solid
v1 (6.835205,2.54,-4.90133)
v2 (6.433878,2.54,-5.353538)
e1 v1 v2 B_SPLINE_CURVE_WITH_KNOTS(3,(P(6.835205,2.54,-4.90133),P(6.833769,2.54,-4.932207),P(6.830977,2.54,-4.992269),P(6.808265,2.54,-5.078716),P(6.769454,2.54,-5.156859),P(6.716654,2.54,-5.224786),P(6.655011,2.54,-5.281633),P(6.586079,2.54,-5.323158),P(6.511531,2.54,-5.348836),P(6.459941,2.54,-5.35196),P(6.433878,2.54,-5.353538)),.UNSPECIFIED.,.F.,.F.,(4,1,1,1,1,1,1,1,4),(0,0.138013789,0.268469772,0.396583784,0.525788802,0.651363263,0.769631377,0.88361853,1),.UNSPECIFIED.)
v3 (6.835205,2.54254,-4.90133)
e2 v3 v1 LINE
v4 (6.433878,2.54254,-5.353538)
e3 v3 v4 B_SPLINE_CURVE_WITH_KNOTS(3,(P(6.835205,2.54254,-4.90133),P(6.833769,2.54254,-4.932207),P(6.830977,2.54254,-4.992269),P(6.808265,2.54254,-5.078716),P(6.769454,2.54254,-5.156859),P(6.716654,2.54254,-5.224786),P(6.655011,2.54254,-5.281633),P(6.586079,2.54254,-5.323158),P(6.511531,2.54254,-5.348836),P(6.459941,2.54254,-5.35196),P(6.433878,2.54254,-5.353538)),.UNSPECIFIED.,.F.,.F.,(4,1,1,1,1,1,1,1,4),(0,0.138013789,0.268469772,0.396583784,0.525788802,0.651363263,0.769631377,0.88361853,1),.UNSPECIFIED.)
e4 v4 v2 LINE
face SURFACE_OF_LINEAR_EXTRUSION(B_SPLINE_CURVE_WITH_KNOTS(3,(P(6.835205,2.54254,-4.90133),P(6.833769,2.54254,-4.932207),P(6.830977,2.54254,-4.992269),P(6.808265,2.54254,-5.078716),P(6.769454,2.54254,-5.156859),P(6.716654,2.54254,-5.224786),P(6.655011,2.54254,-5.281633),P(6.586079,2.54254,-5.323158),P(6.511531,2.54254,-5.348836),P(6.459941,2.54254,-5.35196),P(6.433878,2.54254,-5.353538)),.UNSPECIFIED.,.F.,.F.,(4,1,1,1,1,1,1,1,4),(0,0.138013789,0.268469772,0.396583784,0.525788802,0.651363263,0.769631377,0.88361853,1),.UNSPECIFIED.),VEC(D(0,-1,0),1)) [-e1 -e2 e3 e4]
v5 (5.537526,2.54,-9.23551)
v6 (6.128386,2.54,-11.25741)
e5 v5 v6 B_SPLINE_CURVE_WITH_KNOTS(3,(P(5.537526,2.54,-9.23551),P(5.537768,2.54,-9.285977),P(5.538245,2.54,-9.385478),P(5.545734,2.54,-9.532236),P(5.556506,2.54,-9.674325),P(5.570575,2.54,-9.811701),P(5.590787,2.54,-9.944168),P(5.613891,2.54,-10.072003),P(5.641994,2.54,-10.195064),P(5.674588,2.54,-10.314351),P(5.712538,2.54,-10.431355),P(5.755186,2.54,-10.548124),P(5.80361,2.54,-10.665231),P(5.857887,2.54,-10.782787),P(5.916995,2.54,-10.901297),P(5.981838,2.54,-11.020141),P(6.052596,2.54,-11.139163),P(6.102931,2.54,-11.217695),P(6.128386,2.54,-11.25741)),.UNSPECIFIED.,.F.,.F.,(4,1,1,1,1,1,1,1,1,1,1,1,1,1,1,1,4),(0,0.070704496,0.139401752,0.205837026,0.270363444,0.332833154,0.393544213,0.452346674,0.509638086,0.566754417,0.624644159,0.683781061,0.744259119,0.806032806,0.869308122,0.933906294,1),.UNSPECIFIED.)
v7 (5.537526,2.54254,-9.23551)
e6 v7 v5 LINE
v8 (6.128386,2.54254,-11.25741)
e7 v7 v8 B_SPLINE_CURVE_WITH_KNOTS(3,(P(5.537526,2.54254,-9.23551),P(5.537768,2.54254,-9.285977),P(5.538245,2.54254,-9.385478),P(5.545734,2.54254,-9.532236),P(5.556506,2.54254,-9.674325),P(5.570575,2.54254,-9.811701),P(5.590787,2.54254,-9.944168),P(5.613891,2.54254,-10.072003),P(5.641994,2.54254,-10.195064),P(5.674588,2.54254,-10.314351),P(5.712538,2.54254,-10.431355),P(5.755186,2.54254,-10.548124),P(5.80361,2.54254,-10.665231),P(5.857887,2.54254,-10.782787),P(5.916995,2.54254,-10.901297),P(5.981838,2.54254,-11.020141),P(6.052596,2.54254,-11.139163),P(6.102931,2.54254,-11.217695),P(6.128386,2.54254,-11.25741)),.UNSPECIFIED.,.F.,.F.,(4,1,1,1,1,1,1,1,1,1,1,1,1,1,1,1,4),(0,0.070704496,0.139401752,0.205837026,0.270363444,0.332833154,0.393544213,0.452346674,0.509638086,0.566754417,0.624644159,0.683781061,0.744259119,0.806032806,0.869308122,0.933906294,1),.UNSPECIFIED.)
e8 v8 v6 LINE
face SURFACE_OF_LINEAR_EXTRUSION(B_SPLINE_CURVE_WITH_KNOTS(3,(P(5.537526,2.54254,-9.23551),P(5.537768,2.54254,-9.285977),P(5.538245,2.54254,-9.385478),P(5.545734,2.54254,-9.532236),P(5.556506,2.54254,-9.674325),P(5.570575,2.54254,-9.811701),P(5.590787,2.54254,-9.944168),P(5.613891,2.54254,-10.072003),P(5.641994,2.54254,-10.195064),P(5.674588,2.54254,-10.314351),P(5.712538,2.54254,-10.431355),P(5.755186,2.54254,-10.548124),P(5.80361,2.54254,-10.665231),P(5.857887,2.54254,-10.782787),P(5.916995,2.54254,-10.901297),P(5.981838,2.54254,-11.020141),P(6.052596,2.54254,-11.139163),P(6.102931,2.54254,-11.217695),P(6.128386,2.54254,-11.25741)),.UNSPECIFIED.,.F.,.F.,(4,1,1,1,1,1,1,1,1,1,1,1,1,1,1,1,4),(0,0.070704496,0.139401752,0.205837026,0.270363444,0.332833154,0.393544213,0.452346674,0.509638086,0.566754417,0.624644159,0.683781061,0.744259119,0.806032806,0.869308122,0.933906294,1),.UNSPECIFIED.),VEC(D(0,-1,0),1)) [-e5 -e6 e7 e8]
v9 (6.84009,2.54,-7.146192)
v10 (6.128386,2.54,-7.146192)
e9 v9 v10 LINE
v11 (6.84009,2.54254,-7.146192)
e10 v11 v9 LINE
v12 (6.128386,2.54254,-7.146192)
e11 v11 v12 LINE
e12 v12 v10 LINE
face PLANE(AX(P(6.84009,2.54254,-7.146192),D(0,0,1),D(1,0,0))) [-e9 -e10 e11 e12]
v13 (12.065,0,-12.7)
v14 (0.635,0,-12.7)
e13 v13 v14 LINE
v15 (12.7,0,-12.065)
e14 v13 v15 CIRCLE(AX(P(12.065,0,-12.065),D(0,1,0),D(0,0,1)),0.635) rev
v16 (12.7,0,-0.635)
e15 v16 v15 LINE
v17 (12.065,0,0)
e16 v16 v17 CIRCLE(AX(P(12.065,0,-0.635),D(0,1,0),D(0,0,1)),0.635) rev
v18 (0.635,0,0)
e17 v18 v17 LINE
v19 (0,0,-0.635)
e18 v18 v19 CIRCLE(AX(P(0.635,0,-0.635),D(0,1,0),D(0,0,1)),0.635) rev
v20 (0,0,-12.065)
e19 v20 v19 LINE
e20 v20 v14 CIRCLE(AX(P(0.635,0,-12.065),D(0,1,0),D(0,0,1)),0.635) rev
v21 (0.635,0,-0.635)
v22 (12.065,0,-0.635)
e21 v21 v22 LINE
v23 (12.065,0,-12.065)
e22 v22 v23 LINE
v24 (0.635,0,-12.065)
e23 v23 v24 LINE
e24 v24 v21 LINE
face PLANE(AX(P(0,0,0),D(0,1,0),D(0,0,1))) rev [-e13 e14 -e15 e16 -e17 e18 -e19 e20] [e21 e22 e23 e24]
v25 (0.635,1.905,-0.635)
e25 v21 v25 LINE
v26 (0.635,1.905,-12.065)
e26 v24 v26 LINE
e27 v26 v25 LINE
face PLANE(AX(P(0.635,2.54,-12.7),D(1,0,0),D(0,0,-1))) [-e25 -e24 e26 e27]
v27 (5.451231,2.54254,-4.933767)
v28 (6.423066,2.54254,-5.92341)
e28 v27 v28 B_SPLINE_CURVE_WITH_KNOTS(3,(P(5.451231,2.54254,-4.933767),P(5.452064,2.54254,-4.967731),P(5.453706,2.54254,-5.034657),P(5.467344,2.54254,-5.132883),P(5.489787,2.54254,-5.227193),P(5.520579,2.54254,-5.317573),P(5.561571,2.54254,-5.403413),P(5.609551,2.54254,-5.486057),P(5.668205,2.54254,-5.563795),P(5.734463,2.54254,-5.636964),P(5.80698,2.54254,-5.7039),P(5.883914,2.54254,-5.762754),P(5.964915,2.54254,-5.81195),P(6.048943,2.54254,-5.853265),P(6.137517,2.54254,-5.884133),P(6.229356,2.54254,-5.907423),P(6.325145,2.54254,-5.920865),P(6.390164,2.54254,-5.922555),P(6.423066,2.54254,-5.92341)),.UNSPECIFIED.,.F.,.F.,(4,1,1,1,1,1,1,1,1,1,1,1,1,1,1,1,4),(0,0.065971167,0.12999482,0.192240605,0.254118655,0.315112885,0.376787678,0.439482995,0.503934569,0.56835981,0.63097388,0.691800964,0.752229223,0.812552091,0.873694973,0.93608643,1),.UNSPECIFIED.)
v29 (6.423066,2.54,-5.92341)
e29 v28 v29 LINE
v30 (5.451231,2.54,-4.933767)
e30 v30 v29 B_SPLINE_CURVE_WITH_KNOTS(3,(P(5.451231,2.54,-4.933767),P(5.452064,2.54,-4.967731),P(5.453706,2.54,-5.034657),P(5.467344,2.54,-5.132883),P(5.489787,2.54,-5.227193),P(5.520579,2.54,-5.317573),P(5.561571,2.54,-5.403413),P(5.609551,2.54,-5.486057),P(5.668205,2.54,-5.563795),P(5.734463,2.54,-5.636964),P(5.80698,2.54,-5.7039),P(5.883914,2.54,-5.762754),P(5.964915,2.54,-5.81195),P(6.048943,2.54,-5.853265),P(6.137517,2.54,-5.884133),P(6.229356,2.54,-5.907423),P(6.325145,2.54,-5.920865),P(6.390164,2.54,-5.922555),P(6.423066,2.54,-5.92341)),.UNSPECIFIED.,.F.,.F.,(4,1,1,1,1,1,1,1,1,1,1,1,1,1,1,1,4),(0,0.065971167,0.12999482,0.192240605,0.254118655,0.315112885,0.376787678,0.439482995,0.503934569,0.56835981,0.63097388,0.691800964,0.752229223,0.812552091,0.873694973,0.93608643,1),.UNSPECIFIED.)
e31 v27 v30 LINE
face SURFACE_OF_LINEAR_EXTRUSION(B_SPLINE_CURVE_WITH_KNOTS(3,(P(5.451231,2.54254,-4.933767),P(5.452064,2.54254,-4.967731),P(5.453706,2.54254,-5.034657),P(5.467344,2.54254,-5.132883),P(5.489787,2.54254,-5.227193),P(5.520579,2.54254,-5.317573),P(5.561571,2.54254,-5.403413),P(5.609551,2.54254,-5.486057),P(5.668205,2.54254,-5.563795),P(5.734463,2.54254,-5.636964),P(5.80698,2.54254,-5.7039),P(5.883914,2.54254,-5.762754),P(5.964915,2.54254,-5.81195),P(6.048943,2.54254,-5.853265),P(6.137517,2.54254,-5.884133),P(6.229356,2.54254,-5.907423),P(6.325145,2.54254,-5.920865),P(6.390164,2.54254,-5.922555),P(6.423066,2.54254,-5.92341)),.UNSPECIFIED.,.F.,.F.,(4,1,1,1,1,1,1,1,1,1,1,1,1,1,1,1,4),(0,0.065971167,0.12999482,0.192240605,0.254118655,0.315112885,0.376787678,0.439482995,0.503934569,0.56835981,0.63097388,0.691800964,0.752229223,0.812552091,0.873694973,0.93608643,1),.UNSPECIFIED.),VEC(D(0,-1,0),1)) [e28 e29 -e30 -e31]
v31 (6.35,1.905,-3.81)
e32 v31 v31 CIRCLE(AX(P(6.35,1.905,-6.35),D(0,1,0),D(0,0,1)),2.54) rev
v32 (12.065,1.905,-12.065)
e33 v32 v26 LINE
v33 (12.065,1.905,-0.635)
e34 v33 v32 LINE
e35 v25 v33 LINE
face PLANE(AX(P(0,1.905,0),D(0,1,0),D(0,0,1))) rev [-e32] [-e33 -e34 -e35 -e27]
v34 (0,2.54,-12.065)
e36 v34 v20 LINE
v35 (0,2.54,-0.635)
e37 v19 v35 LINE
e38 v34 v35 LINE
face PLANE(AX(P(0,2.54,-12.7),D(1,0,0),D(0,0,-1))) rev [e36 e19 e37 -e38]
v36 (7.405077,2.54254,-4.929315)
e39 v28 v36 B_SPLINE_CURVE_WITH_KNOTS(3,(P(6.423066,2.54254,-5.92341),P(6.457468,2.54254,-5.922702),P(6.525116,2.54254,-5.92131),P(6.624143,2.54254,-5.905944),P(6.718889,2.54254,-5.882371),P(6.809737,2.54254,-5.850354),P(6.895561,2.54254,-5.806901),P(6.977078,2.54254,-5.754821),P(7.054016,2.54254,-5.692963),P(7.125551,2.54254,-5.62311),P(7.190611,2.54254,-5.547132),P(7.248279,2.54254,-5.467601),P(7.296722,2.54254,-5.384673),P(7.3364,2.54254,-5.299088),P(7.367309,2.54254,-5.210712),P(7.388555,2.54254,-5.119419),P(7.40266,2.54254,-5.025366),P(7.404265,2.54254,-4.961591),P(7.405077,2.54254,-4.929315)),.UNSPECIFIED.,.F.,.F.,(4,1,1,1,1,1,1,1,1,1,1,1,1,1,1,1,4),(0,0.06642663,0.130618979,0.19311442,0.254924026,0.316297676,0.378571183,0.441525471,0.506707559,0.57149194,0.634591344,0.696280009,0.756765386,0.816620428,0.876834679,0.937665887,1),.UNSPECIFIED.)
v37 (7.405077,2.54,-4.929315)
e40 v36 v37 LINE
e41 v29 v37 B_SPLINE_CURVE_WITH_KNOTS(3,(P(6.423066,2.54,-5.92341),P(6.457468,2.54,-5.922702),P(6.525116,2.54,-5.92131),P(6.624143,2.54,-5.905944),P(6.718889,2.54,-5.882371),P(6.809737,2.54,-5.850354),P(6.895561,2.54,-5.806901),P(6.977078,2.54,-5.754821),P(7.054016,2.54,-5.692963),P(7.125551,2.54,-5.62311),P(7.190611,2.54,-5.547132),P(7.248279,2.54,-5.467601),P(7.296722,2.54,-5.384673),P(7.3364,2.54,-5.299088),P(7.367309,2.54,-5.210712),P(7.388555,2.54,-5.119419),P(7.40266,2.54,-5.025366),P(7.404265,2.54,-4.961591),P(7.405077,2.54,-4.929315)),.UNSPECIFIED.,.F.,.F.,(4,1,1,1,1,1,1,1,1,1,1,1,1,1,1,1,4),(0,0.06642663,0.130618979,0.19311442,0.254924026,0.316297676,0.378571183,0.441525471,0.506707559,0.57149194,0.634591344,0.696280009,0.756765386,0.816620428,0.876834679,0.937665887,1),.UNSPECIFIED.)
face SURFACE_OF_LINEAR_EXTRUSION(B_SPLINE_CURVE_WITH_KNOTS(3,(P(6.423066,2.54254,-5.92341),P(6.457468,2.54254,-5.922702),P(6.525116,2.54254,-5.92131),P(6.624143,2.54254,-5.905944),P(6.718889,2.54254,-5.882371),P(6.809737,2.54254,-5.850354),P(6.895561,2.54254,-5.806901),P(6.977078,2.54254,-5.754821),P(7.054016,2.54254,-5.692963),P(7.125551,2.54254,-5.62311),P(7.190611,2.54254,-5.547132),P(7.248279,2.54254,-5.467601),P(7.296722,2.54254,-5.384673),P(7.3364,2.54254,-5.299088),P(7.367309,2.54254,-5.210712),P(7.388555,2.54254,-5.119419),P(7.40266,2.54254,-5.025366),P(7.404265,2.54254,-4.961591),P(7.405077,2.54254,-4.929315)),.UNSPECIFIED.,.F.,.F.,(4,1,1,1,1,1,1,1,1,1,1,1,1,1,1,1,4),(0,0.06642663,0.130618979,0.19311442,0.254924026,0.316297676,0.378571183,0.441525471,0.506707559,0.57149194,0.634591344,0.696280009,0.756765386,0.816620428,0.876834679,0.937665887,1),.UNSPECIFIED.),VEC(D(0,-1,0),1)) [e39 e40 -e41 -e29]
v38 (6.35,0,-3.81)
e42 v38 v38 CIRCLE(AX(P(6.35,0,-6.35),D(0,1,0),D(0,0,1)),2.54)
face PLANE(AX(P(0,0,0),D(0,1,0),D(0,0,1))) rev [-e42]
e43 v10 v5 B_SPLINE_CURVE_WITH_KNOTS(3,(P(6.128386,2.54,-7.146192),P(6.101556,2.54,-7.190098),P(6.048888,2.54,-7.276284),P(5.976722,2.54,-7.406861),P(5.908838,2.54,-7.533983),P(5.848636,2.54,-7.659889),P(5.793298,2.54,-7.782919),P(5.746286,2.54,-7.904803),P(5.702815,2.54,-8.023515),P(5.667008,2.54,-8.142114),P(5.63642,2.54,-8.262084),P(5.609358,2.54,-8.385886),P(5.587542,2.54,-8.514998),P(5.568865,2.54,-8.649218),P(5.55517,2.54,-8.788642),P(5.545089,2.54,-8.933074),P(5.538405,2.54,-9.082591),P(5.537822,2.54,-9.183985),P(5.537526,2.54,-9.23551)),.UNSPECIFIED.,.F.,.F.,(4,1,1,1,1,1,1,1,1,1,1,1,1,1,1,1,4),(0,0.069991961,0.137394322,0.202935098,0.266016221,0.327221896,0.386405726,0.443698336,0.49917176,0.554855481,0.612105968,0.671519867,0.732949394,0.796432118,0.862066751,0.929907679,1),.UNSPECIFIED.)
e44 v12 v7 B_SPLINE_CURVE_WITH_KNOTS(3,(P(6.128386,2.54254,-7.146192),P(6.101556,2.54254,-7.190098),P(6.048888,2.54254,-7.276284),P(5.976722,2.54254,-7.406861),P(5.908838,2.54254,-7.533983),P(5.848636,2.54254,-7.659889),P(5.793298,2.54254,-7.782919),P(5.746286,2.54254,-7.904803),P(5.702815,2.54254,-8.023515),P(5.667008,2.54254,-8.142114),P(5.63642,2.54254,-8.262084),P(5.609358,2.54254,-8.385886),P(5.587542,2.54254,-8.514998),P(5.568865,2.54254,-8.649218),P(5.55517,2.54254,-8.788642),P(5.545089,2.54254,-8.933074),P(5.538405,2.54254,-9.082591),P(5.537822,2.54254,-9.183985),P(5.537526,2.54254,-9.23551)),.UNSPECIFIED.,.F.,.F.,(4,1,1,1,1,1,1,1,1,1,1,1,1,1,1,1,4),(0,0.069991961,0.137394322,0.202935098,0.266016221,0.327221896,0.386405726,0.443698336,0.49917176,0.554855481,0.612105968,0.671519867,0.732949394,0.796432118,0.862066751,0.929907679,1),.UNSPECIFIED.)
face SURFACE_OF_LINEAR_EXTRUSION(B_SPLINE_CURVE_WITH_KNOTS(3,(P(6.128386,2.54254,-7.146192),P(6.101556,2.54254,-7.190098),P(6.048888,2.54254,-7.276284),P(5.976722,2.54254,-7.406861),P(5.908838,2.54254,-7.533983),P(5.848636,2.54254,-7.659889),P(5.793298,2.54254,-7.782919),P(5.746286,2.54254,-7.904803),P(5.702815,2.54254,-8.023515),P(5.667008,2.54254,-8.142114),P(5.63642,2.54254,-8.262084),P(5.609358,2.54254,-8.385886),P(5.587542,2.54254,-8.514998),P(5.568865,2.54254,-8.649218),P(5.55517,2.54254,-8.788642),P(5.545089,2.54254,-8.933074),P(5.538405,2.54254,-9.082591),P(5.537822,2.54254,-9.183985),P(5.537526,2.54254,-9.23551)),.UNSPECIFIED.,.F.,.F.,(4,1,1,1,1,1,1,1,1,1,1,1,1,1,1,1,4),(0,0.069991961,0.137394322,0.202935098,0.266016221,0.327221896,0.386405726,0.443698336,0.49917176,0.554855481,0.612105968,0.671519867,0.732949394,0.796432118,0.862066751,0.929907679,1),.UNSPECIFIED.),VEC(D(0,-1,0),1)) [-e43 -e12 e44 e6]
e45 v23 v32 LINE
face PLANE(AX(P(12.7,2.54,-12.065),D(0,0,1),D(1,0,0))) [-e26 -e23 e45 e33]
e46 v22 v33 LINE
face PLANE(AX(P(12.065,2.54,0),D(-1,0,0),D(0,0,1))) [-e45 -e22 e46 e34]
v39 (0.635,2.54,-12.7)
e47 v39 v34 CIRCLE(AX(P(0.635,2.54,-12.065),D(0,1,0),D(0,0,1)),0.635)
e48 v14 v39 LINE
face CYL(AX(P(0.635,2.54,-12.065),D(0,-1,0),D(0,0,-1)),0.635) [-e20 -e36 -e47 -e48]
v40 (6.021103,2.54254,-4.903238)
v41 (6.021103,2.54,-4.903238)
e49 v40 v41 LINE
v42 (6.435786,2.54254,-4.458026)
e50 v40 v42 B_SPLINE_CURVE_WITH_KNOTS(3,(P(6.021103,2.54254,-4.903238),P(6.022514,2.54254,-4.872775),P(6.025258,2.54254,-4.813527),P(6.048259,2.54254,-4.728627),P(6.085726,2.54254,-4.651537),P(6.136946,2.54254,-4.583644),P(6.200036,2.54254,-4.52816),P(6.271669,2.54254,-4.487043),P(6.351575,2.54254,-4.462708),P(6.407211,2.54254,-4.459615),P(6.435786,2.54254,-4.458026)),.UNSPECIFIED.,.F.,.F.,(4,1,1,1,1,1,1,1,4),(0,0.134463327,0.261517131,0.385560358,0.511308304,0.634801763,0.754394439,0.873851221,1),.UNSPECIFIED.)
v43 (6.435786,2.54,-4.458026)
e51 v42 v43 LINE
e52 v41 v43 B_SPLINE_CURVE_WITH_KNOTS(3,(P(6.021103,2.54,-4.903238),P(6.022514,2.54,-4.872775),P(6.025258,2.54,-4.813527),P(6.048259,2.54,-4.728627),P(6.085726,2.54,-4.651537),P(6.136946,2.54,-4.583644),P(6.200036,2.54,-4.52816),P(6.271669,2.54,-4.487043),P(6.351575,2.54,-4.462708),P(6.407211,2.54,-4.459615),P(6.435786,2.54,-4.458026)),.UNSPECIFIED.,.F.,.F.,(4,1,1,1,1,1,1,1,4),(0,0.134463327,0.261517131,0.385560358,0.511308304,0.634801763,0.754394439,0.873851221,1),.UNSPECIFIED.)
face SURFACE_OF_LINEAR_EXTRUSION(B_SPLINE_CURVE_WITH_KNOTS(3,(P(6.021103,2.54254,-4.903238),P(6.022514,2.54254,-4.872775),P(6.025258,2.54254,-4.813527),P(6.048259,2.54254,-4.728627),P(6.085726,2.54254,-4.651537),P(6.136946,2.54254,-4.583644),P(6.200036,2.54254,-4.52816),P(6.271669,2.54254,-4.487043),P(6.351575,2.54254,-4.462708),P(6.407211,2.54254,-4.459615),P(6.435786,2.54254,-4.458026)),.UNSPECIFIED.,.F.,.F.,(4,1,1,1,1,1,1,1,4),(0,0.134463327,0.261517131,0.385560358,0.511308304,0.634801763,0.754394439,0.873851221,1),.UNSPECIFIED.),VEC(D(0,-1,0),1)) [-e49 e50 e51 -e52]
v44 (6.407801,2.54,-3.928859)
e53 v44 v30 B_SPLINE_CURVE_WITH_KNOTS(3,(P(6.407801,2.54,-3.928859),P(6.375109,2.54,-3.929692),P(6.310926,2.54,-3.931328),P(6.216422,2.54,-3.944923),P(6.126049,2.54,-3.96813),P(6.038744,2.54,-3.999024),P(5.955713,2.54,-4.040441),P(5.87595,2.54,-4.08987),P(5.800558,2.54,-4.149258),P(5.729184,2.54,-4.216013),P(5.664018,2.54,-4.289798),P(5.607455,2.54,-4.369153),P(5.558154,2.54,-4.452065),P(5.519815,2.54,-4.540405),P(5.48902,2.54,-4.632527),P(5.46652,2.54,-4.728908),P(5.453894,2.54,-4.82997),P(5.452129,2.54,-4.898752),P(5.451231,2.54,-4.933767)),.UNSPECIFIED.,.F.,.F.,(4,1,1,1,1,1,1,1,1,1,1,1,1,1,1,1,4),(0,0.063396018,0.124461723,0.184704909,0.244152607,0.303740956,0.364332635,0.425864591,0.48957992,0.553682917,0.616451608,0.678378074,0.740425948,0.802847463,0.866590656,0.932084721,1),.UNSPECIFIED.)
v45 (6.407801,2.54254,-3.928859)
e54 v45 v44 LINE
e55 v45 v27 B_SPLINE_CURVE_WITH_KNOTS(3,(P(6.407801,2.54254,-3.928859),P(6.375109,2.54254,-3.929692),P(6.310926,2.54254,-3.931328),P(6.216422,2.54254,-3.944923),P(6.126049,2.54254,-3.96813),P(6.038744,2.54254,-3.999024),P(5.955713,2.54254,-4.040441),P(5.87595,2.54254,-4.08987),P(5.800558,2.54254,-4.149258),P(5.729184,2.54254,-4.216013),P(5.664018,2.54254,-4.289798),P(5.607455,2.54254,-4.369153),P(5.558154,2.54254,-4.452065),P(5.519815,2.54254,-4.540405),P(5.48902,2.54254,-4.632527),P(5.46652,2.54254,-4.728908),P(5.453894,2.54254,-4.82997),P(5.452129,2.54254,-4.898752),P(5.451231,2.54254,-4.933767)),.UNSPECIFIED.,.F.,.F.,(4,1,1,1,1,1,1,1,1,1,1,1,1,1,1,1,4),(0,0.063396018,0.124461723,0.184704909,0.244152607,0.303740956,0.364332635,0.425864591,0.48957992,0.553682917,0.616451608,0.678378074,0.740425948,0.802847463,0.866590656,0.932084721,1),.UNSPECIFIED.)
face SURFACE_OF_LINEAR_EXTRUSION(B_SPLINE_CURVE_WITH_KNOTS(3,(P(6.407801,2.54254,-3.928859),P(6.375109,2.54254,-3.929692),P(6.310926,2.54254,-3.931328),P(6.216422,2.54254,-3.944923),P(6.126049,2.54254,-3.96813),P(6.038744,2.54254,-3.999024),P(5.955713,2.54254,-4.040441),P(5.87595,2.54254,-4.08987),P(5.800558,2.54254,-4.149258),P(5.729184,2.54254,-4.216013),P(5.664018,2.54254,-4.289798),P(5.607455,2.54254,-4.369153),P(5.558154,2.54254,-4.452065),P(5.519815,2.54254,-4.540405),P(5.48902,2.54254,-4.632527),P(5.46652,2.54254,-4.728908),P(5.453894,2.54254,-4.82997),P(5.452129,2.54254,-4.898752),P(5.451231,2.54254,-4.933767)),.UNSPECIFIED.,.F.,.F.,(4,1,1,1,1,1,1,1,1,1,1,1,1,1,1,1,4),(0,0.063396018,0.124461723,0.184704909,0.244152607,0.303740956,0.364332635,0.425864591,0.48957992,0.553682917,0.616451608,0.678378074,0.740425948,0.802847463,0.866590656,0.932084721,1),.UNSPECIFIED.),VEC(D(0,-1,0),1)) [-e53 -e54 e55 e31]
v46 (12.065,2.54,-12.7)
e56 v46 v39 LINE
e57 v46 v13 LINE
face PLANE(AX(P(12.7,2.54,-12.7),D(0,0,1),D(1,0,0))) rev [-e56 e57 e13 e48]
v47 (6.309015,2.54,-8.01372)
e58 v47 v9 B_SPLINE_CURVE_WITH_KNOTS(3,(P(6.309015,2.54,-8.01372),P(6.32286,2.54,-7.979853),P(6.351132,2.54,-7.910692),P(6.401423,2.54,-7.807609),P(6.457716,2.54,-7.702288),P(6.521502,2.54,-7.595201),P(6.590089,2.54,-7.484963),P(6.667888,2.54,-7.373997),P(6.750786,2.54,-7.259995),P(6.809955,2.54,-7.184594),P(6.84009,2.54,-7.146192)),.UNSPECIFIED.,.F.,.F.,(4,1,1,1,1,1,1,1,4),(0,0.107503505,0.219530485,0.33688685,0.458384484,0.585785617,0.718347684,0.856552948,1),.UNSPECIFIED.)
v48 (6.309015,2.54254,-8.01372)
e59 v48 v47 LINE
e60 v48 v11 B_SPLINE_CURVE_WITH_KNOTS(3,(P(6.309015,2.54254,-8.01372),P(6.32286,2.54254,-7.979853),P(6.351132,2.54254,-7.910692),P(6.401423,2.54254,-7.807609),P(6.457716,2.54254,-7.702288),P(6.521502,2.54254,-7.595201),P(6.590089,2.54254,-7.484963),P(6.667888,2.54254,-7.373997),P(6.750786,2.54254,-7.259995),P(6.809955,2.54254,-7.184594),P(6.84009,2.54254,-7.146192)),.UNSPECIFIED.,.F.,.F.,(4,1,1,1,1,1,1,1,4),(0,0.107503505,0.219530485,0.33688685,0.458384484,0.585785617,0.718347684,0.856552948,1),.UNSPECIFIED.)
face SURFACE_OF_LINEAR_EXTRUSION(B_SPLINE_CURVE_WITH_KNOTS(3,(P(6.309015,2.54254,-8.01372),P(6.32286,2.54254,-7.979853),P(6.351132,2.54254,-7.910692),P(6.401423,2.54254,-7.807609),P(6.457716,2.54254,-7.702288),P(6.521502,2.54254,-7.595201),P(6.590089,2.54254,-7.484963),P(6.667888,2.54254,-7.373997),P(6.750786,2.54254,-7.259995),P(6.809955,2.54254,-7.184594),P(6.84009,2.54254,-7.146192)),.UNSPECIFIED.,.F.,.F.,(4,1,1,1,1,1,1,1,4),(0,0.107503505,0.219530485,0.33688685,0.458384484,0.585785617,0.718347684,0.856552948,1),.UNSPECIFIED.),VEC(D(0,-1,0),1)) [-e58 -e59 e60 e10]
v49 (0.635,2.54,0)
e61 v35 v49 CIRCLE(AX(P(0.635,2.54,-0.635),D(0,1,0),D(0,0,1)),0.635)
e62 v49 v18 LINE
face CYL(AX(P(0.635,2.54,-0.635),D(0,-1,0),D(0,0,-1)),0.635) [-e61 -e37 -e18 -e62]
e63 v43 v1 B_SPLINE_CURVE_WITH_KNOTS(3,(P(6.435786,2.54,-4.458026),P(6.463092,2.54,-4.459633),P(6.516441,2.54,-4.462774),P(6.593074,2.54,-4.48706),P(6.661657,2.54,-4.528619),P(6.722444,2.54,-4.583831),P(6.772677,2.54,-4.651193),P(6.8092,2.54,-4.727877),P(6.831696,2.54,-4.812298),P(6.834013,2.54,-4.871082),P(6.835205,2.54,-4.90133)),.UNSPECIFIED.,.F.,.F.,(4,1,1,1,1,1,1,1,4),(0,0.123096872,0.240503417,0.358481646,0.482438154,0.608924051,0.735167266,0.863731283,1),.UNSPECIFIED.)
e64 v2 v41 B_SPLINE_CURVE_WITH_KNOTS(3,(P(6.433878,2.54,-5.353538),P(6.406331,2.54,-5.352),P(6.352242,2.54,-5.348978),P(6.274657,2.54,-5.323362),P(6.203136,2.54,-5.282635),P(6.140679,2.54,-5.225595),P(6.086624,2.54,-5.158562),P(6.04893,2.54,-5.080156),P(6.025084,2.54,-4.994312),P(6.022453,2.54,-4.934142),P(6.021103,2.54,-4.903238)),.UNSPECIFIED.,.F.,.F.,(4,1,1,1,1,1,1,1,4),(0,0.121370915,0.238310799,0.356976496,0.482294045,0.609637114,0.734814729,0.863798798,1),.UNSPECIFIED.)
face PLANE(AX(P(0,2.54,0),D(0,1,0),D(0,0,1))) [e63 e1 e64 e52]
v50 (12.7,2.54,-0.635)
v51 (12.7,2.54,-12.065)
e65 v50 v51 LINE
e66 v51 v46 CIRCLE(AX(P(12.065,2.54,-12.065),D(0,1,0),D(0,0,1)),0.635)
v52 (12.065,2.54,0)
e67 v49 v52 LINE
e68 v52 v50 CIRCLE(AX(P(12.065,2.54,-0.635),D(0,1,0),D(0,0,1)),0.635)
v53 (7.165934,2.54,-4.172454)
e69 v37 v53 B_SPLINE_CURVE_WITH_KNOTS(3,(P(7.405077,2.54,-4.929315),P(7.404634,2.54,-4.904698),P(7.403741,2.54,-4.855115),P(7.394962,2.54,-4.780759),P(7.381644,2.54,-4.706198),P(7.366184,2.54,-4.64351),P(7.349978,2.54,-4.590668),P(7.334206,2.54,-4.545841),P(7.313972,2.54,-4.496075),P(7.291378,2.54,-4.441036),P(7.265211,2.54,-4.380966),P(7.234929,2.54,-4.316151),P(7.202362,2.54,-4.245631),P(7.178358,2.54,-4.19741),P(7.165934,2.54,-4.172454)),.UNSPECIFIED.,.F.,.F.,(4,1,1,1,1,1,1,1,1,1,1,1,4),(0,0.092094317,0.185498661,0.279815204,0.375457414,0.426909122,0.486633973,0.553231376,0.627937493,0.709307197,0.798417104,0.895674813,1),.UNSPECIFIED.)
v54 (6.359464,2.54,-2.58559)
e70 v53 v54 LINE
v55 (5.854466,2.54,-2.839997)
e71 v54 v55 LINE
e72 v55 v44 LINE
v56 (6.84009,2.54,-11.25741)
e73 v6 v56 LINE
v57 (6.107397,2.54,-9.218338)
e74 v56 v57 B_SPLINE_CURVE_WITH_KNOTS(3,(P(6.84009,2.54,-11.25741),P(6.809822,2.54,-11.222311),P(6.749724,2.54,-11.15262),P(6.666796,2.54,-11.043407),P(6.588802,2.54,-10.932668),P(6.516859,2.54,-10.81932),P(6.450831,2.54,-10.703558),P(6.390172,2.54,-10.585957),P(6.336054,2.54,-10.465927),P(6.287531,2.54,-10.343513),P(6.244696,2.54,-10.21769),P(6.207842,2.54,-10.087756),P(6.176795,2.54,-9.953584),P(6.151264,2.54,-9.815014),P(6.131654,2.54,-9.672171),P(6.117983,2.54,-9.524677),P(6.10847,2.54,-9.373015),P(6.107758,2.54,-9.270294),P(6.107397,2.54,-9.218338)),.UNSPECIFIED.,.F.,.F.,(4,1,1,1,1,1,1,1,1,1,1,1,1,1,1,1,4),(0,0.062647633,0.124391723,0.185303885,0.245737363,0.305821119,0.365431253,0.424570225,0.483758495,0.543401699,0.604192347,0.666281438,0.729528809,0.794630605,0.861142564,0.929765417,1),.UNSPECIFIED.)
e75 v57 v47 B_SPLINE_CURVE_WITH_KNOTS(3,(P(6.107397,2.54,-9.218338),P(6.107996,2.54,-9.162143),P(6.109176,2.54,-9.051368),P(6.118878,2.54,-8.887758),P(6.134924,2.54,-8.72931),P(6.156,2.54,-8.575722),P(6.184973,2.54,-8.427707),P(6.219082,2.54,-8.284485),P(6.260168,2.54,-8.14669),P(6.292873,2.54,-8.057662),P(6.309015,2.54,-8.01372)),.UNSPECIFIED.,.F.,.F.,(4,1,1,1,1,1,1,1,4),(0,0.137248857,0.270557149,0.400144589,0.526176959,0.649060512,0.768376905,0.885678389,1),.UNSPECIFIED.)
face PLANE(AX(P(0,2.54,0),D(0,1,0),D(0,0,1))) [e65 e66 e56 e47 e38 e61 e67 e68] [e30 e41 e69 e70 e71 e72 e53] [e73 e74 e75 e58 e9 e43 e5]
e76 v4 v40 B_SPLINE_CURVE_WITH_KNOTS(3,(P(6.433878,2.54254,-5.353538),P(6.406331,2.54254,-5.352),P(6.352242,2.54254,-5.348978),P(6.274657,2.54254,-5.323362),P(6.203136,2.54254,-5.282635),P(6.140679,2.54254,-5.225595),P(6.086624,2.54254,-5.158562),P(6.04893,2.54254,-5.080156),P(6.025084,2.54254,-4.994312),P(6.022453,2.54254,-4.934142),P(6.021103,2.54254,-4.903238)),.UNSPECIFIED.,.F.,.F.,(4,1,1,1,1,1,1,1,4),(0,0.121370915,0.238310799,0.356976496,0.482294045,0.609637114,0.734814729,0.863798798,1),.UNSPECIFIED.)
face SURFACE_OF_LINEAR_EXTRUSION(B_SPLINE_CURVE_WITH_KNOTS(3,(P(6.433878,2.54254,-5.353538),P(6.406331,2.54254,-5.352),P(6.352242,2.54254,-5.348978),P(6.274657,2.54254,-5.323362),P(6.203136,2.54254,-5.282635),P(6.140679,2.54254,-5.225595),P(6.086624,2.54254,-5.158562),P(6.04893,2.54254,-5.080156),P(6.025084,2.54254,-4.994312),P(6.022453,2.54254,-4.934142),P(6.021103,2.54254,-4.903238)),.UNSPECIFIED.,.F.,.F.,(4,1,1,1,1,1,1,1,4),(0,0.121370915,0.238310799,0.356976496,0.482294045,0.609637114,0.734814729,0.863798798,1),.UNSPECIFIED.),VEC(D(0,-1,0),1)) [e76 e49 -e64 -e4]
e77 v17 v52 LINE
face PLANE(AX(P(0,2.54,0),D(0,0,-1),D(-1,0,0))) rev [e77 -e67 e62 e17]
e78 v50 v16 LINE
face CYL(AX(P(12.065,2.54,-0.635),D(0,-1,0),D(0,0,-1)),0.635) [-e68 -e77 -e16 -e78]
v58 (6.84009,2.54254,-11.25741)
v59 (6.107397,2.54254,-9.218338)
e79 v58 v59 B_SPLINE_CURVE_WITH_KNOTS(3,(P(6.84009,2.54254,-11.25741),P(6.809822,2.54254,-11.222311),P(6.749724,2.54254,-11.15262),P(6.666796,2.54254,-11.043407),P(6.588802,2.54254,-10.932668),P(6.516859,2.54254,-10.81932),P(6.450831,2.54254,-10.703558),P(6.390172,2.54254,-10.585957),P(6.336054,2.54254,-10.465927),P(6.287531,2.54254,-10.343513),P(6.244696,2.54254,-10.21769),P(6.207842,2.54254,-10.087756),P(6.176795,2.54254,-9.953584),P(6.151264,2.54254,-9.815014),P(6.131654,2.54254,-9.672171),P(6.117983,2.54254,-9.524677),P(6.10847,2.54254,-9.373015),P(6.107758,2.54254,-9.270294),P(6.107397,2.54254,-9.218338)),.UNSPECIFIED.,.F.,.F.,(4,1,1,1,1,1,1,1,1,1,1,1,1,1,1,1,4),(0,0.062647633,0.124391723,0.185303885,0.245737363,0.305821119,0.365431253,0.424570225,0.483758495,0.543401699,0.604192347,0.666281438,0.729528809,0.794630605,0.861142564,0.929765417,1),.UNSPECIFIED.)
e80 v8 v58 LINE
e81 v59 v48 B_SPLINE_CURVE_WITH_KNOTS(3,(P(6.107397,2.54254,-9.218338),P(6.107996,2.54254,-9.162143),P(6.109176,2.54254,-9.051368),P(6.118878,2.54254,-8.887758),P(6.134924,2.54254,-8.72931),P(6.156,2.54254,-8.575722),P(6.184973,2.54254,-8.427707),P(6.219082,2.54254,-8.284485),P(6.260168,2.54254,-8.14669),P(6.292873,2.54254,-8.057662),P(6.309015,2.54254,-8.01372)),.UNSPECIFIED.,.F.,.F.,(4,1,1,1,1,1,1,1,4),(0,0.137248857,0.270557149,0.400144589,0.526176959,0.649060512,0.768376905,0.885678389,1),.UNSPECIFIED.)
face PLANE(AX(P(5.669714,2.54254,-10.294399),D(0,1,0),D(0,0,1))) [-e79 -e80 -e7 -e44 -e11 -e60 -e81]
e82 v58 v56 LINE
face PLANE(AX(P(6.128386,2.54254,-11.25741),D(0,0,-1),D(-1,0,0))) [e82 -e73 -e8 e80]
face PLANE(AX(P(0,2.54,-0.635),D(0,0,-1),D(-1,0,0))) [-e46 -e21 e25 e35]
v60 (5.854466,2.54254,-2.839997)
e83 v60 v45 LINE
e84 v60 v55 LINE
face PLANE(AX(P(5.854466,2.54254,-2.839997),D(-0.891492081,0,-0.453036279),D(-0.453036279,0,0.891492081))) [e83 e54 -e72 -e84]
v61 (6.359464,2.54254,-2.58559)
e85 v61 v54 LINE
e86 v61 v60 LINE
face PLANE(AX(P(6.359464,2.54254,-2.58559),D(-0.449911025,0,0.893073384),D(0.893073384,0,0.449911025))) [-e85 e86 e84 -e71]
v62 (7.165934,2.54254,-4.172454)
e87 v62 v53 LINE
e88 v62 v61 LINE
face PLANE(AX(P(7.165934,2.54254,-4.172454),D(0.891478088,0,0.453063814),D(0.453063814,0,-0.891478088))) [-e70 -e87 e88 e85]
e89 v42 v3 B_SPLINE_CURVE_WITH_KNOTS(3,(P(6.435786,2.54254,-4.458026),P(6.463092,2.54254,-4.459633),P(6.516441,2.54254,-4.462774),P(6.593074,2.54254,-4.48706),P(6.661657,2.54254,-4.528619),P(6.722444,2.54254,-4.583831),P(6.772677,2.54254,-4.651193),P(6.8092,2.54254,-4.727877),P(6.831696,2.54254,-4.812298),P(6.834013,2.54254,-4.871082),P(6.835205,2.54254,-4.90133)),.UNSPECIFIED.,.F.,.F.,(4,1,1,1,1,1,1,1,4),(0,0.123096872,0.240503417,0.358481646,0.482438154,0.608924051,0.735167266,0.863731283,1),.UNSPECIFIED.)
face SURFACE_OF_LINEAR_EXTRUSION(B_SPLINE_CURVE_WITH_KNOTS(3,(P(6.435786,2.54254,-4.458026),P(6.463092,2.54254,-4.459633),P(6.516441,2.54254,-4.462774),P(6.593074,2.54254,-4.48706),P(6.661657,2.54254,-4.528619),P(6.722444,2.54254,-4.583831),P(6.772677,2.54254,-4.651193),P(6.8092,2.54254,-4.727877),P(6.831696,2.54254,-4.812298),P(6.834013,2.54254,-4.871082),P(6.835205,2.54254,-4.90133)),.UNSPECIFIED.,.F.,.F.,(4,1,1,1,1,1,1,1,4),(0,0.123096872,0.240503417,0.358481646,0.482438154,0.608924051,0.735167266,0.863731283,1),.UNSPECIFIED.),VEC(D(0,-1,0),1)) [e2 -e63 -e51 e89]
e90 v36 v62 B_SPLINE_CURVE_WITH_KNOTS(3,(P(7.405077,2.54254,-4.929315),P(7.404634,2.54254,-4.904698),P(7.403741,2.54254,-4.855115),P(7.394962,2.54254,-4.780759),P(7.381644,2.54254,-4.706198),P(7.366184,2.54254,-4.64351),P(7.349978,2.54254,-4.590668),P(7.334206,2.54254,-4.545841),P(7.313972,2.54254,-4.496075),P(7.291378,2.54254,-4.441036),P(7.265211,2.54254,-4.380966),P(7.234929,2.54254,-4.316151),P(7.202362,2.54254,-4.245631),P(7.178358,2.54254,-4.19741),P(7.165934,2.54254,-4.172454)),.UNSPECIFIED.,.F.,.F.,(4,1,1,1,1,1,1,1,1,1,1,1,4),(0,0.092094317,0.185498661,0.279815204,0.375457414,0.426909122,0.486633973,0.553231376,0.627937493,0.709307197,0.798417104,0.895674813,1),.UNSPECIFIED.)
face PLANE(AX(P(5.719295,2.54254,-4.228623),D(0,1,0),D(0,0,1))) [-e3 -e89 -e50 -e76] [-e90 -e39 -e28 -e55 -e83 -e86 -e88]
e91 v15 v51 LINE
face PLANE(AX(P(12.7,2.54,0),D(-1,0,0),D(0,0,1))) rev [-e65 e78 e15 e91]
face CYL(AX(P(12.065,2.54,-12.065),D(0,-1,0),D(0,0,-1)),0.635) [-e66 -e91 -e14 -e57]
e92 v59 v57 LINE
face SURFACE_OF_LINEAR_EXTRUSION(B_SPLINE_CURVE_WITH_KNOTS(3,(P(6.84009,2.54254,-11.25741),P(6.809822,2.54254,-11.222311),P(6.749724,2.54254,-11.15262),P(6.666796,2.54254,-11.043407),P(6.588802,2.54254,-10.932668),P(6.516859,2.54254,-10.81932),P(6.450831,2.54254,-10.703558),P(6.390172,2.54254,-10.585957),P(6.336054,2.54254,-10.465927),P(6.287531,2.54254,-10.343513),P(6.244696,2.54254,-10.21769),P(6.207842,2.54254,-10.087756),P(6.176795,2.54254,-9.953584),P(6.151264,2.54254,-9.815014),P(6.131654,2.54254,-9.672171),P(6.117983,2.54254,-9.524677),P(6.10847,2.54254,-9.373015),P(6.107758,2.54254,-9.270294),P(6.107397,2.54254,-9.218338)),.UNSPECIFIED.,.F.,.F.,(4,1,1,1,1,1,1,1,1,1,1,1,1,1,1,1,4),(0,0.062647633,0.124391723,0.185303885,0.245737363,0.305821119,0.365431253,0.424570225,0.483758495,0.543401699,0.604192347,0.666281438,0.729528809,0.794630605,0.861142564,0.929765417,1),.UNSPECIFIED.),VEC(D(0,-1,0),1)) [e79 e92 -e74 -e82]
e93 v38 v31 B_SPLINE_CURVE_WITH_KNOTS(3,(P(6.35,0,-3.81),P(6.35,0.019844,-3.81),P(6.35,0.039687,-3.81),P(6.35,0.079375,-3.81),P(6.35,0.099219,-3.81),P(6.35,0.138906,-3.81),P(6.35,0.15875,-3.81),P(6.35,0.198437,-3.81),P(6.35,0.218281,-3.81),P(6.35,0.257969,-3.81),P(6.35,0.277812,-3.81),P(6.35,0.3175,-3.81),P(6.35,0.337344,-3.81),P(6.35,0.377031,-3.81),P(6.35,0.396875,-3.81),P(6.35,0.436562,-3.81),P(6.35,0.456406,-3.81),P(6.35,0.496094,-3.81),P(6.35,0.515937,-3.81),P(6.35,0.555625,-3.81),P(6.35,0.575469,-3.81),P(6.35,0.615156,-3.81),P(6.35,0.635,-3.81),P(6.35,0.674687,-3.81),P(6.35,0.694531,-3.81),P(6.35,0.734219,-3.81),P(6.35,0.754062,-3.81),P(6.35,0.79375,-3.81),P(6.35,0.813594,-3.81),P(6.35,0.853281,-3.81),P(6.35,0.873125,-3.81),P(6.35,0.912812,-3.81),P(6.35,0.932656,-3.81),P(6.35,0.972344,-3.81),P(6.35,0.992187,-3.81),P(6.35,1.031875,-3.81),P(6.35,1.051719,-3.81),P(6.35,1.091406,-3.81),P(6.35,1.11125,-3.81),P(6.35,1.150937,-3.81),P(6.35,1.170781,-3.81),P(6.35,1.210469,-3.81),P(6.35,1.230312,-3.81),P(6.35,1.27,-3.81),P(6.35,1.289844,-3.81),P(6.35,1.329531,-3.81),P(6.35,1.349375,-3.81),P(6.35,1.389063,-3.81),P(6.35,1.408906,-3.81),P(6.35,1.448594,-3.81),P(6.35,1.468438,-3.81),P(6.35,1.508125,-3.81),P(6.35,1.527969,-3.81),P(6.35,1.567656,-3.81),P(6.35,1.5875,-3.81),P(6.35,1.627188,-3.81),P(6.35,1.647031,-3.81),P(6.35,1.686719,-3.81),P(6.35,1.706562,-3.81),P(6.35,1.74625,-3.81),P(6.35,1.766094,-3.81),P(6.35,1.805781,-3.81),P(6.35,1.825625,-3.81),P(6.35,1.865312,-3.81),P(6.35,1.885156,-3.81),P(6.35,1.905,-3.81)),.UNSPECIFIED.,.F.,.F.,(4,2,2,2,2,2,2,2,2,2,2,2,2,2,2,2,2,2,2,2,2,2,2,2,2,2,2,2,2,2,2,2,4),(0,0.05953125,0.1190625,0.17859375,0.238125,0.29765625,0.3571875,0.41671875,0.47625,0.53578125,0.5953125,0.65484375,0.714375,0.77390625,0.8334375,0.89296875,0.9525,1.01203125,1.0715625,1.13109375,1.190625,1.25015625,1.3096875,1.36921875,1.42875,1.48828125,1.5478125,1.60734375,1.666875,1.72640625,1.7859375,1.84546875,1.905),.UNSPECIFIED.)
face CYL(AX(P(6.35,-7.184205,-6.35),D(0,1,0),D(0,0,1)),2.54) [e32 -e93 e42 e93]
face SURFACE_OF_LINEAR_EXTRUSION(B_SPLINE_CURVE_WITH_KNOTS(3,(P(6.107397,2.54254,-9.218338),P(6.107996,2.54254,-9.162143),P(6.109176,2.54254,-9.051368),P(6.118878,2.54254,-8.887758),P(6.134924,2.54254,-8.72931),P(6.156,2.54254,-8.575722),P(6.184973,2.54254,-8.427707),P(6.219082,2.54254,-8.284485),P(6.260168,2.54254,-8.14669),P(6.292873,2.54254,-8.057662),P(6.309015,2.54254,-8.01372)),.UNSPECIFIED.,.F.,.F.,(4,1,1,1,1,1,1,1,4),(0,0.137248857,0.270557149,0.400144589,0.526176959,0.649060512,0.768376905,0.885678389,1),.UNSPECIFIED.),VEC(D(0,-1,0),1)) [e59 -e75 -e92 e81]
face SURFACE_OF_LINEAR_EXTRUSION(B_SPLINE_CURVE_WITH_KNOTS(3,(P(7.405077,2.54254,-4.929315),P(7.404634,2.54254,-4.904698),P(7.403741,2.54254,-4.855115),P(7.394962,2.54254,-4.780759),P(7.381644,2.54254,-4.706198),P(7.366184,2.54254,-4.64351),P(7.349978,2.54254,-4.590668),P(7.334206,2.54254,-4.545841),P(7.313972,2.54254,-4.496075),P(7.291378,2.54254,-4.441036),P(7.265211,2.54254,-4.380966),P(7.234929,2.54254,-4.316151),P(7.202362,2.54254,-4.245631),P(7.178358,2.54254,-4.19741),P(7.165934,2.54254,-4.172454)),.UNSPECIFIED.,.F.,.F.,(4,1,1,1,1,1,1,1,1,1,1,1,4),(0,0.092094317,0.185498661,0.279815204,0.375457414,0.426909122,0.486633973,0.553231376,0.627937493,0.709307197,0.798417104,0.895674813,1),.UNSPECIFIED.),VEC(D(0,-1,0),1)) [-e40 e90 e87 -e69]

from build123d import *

# Parameters (mm, degrees)
SKETCH1_W           = 12.7
SKETCH1_H           = 12.7
BOSS_EXTRUDE1_DEPTH = 2.54
FILLET1_R           = 0.635
SHELL1_START        = 0.635
SHELL1_OUTLINE_W    = 1.905
SHELL1_OUTLINE_H    = 11.43
SHELL1_DEPTH        = 11.43
SKETCH2_R           = 2.54
BOSS_EXTRUDE2_DEPTH = 1.905
BOSS_EXTRUDE4_DEPTH = 0.00254


# Read off the part's stored shape, not the designer's step: Shell1
with BuildPart() as part:
    # Sketch1 → Boss-Extrude1 (new body)
    with BuildSketch(Plane(origin=(0, 0, 0), x_dir=(1, 0, 0), z_dir=(0, 1, 0))):
        with Locations((6.35, 6.35)):
            Rectangle(SKETCH1_W, SKETCH1_H)
    extrude(amount=BOSS_EXTRUDE1_DEPTH)

    # Fillet1
    fillet1_edges = [part.edges().sort_by_distance(p)[0] for p in [
        (0, 1.27, -12.7),
        (12.7, 1.27, -12.7),
        (12.7, 1.27, 0),
        (0, 1.27, 0),
    ]]
    fillet(fillet1_edges, radius=FILLET1_R)

    # Shell1 outline → Shell1 (cut)
    with BuildSketch(Plane.YZ.offset(SHELL1_START)):
        with Locations((0.9525, -6.35)):
            Rectangle(SHELL1_OUTLINE_W, SHELL1_OUTLINE_H)
    extrude(amount=SHELL1_DEPTH, mode=Mode.SUBTRACT)

    # Sketch2 → Boss-Extrude2 (add)
    with BuildSketch(Plane(origin=(0, 1.905, 0), x_dir=(-1, 0, 0), z_dir=(0, -1, 0))):
        with Locations(Location((-6.35, 6.35, 0), (0, 0, 270))):
            Circle(SKETCH2_R)
    extrude(amount=BOSS_EXTRUDE2_DEPTH)

    # Sketch4 → Boss-Extrude4 (add)
    # profile 1 of 2: a face of its own
    with BuildSketch(Plane(origin=(0, 2.54, 0), x_dir=(1, 0, 0), z_dir=(0, 1, 0))):
        with BuildLine():
            Line((6.359463942, 2.585589744), (5.854465946, 2.839996795))
            Line((5.854465946, 2.839996795), (6.407801282, 3.928858974))
            add(Edge.make_bspline(
                [(6.407801282, 3.928858974), (6.37510896, 3.929692258), (6.310926022, 3.931328196), (6.216421654, 3.944922824), (6.126049401, 3.968129722), (6.038744074, 3.999023949), (5.955713077, 4.040440861), (5.875949592, 4.089869773), (5.800557817, 4.1492579), (5.72918427, 4.21601261), (5.664017941, 4.289798172), (5.607454945, 4.369153296), (5.558153789, 4.452064974), (5.519814505, 4.540404997), (5.489020198, 4.632526927), (5.466520324, 4.728907598), (5.45389399, 4.829969864), (5.452129186, 4.898751737), (5.451230769, 4.933766827)],
                knots=[0, 0, 0, 0, 1.014336294, 1.991387562, 2.955278539, 3.906441712, 4.859855302, 5.829322156, 6.813833455, 7.833278715, 8.858926674, 9.863225732, 10.85404919, 11.846815163, 12.845559416, 13.865450493, 14.913355531, 16, 16, 16, 16], degree=3))
            add(Edge.make_bspline(
                [(5.451230769, 4.933766827), (5.4520641, 4.967731119), (5.45370616, 5.034657053), (5.467343628, 5.132882545), (5.48978737, 5.227193368), (5.520579382, 5.317573499), (5.561571384, 5.40341349), (5.60955148, 5.486057396), (5.66820497, 5.563795404), (5.734463459, 5.636964041), (5.80697986, 5.703900425), (5.883913674, 5.762753864), (5.964915094, 5.811949684), (6.048943173, 5.853265097), (6.137516777, 5.884133404), (6.229355921, 5.907423313), (6.325144744, 5.920864918), (6.3901642, 5.922555021), (6.423065705, 5.923410256)],
                knots=[0, 0, 0, 0, 1.055538678, 2.079917126, 3.075849687, 4.065898488, 5.041806164, 6.028602842, 7.031727914, 8.062953097, 9.093756959, 10.095582084, 11.068815425, 12.035667573, 13.000833448, 13.979119574, 14.977382875, 16, 16, 16, 16], degree=3))
            add(Edge.make_bspline(
                [(6.423065705, 5.923410256), (6.457468209, 5.922702118), (6.525116079, 5.92130966), (6.624143475, 5.905944432), (6.71888888, 5.882371363), (6.809737259, 5.850354325), (6.895560767, 5.806900578), (6.977077532, 5.754820959), (7.054016404, 5.692963174), (7.125551114, 5.623110154), (7.190611134, 5.547131925), (7.248278747, 5.467601049), (7.296721989, 5.384673031), (7.336399968, 5.299087975), (7.367308914, 5.210711801), (7.388554875, 5.119419152), (7.402659837, 5.025366142), (7.4042647, 4.961591251), (7.405076923, 4.929314704)],
                knots=[0, 0, 0, 0, 1.062826075, 2.08990367, 3.089830715, 4.078784409, 5.060762809, 6.057138927, 7.064407536, 8.107320944, 9.143871033, 10.153461498, 11.140480137, 12.108246174, 13.065926856, 14.029354859, 15.002654194, 16, 16, 16, 16], degree=3))
            add(Edge.make_bspline(
                [(7.405076923, 4.929314704), (7.404633685, 4.904698148), (7.403740905, 4.855114869), (7.39496241, 4.780759368), (7.381643664, 4.706197784), (7.36618444, 4.643509984), (7.349977595, 4.590667976), (7.334206488, 4.545841333), (7.313971695, 4.496075342), (7.291377525, 4.441036433), (7.265210817, 4.38096596), (7.234929053, 4.316151081), (7.202362379, 4.245630527), (7.178357526, 4.197409534), (7.165934295, 4.172453726)],
                knots=[0, 0, 0, 0, 1.105131805, 2.225983929, 3.357782449, 4.505488967, 5.122909461, 5.839607681, 6.638776516, 7.535249922, 8.51168636, 9.581005249, 10.748097757, 12, 12, 12, 12], degree=3))
            Line((7.165934295, 4.172453726), (6.359463942, 2.585589744))
        make_face()
        with BuildLine():
            add(Edge.make_bspline(
                [(6.435786058, 4.458025641), (6.46309194, 4.459633217), (6.516441451, 4.462774058), (6.593074476, 4.487059704), (6.661657137, 4.528619041), (6.722444439, 4.583831174), (6.772677205, 4.651192501), (6.809199713, 4.727877384), (6.831696453, 4.812297764), (6.834013104, 4.871082471), (6.835205128, 4.901329928)],
                knots=[0, 0, 0, 0, 0.984774978, 1.924027336, 2.867853169, 3.859505234, 4.871392407, 5.881338128, 6.909850265, 8, 8, 8, 8], degree=3))
            add(Edge.make_bspline(
                [(6.835205128, 4.901329928), (6.833769465, 4.932206601), (6.830976757, 4.992269104), (6.808264507, 5.078715896), (6.76945384, 5.156858669), (6.716654147, 5.224786259), (6.655011194, 5.281632973), (6.586078813, 5.323157968), (6.511530825, 5.348835693), (6.45994101, 5.351960048), (6.433878005, 5.353538462)],
                knots=[0, 0, 0, 0, 1.104110315, 2.147758178, 3.172670271, 4.206310416, 5.210906102, 6.157051016, 7.068948237, 8, 8, 8, 8], degree=3))
            add(Edge.make_bspline(
                [(6.433878005, 5.353538462), (6.406330871, 5.351999712), (6.3522423, 5.348978389), (6.274657461, 5.323362327), (6.203136419, 5.282634751), (6.140678718, 5.225595158), (6.086623972, 5.158562153), (6.048930123, 5.080155613), (6.025083687, 4.99431208), (6.022453466, 4.934141867), (6.021102564, 4.903237981)],
                knots=[0, 0, 0, 0, 0.970967322, 1.90648639, 2.855811969, 3.858352357, 4.877096915, 5.878517833, 6.91039038, 8, 8, 8, 8], degree=3))
            add(Edge.make_bspline(
                [(6.021102564, 4.903237981), (6.022513665, 4.872774607), (6.025258108, 4.813526525), (6.048259331, 4.728627364), (6.085726018, 4.651536658), (6.136945653, 4.583644091), (6.20003563, 4.528159923), (6.271669441, 4.487043277), (6.3515753, 4.462708207), (6.407210509, 4.459614594), (6.435786058, 4.458025641)],
                knots=[0, 0, 0, 0, 1.075706617, 2.092137047, 3.084482865, 4.090466434, 5.0784141, 6.035155512, 6.990809768, 8, 8, 8, 8], degree=3))
        make_face(mode=Mode.SUBTRACT)
    # profile 2 of 2: a face of its own
    with BuildSketch(Plane(origin=(0, 2.54, 0), x_dir=(1, 0, 0), z_dir=(0, 1, 0))):
        with BuildLine():
            Line((6.128386018, 11.257410256), (6.840089744, 11.257410256))
            add(Edge.make_bspline(
                [(6.840089744, 11.257410256), (6.809822419, 11.222311467), (6.749724305, 11.152620105), (6.666795677, 11.043407385), (6.58880222, 10.932667564), (6.516859259, 10.819319518), (6.450831014, 10.703557736), (6.390172367, 10.585956901), (6.336053768, 10.465927477), (6.287531103, 10.343512884), (6.244695572, 10.21769031), (6.207842411, 10.087755624), (6.176795055, 9.953583531), (6.151264275, 9.815013647), (6.131654114, 9.672170871), (6.117982965, 9.524677216), (6.108469866, 9.373014933), (6.107757668, 9.270294234), (6.107397436, 9.21833774)],
                knots=[0, 0, 0, 0, 1.00236213, 1.990267575, 2.964862165, 3.931797803, 4.893137898, 5.846900052, 6.793123604, 7.740135921, 8.694427184, 9.667077551, 10.660503013, 11.672460941, 12.714089686, 13.778281025, 14.87624668, 16, 16, 16, 16], degree=3))
            add(Edge.make_bspline(
                [(6.107397436, 9.21833774), (6.107995993, 9.162143219), (6.109175923, 9.051367583), (6.118877551, 8.887757803), (6.134923993, 8.729310145), (6.155999738, 8.575722074), (6.184973215, 8.427707126), (6.219082012, 8.284484773), (6.260167582, 8.146690387), (6.292872796, 8.057661908), (6.309015024, 8.013720353)],
                knots=[0, 0, 0, 0, 1.097990858, 2.164457195, 3.201156713, 4.209415668, 5.192484095, 6.147015238, 7.085427113, 8, 8, 8, 8], degree=3))
            add(Edge.make_bspline(
                [(6.309015024, 8.013720353), (6.322859685, 7.979852544), (6.351131554, 7.910691856), (6.401423106, 7.807609383), (6.457716212, 7.702288141), (6.521502326, 7.595201452), (6.590089423, 7.484963434), (6.66788775, 7.373996815), (6.750785957, 7.259995238), (6.809954754, 7.184594376), (6.840089744, 7.146192308)],
                knots=[0, 0, 0, 0, 0.860028042, 1.756243877, 2.695094802, 3.667075869, 4.686284936, 5.746781471, 6.852423585, 8, 8, 8, 8], degree=3))
            Line((6.840089744, 7.146192308), (6.128386018, 7.146192308))
            add(Edge.make_bspline(
                [(6.128386018, 7.146192308), (6.101555843, 7.190097535), (6.048888171, 7.276283561), (5.97672167, 7.406860871), (5.908837677, 7.533983087), (5.84863606, 7.65988857), (5.79329841, 7.782919252), (5.746285673, 7.904803232), (5.702814586, 8.023514572), (5.667008208, 8.142113651), (5.636420071, 8.262084169), (5.609358218, 8.385886124), (5.587541556, 8.514997933), (5.568864716, 8.649218102), (5.555169811, 8.788642241), (5.545088524, 8.933073848), (5.538405493, 9.082591024), (5.537822099, 9.183985488), (5.537525641, 9.235510216)],
                knots=[0, 0, 0, 0, 1.119871376, 2.19830916, 3.246961562, 4.256259542, 5.235550337, 6.182491613, 7.09917337, 7.986748165, 8.877687696, 9.793695483, 10.744317876, 11.727190303, 12.742913882, 13.793068013, 14.878522868, 16, 16, 16, 16], degree=3))
            add(Edge.make_bspline(
                [(5.537525641, 9.235510216), (5.537767643, 9.285977066), (5.538244775, 9.385478056), (5.545734032, 9.532235898), (5.556506209, 9.67432497), (5.570575435, 9.81170086), (5.590786974, 9.944167937), (5.613890789, 10.072003043), (5.641993832, 10.195063696), (5.674588264, 10.314351115), (5.712537615, 10.431354955), (5.755186155, 10.548123871), (5.803610458, 10.665231326), (5.857886642, 10.78278746), (5.916995095, 10.901297384), (5.981837867, 11.020140735), (6.052595779, 11.139162984), (6.102930607, 11.217694947), (6.128386018, 11.257410256)],
                knots=[0, 0, 0, 0, 1.13127193, 2.230428031, 3.293392423, 4.325815098, 5.325330466, 6.296707414, 7.23754678, 8.15420938, 9.068070667, 9.994306547, 10.940496973, 11.908145907, 12.896524899, 13.908929949, 14.942500703, 16, 16, 16, 16], degree=3))
        make_face()
    extrude(amount=BOSS_EXTRUDE4_DEPTH)


solid = part.part
